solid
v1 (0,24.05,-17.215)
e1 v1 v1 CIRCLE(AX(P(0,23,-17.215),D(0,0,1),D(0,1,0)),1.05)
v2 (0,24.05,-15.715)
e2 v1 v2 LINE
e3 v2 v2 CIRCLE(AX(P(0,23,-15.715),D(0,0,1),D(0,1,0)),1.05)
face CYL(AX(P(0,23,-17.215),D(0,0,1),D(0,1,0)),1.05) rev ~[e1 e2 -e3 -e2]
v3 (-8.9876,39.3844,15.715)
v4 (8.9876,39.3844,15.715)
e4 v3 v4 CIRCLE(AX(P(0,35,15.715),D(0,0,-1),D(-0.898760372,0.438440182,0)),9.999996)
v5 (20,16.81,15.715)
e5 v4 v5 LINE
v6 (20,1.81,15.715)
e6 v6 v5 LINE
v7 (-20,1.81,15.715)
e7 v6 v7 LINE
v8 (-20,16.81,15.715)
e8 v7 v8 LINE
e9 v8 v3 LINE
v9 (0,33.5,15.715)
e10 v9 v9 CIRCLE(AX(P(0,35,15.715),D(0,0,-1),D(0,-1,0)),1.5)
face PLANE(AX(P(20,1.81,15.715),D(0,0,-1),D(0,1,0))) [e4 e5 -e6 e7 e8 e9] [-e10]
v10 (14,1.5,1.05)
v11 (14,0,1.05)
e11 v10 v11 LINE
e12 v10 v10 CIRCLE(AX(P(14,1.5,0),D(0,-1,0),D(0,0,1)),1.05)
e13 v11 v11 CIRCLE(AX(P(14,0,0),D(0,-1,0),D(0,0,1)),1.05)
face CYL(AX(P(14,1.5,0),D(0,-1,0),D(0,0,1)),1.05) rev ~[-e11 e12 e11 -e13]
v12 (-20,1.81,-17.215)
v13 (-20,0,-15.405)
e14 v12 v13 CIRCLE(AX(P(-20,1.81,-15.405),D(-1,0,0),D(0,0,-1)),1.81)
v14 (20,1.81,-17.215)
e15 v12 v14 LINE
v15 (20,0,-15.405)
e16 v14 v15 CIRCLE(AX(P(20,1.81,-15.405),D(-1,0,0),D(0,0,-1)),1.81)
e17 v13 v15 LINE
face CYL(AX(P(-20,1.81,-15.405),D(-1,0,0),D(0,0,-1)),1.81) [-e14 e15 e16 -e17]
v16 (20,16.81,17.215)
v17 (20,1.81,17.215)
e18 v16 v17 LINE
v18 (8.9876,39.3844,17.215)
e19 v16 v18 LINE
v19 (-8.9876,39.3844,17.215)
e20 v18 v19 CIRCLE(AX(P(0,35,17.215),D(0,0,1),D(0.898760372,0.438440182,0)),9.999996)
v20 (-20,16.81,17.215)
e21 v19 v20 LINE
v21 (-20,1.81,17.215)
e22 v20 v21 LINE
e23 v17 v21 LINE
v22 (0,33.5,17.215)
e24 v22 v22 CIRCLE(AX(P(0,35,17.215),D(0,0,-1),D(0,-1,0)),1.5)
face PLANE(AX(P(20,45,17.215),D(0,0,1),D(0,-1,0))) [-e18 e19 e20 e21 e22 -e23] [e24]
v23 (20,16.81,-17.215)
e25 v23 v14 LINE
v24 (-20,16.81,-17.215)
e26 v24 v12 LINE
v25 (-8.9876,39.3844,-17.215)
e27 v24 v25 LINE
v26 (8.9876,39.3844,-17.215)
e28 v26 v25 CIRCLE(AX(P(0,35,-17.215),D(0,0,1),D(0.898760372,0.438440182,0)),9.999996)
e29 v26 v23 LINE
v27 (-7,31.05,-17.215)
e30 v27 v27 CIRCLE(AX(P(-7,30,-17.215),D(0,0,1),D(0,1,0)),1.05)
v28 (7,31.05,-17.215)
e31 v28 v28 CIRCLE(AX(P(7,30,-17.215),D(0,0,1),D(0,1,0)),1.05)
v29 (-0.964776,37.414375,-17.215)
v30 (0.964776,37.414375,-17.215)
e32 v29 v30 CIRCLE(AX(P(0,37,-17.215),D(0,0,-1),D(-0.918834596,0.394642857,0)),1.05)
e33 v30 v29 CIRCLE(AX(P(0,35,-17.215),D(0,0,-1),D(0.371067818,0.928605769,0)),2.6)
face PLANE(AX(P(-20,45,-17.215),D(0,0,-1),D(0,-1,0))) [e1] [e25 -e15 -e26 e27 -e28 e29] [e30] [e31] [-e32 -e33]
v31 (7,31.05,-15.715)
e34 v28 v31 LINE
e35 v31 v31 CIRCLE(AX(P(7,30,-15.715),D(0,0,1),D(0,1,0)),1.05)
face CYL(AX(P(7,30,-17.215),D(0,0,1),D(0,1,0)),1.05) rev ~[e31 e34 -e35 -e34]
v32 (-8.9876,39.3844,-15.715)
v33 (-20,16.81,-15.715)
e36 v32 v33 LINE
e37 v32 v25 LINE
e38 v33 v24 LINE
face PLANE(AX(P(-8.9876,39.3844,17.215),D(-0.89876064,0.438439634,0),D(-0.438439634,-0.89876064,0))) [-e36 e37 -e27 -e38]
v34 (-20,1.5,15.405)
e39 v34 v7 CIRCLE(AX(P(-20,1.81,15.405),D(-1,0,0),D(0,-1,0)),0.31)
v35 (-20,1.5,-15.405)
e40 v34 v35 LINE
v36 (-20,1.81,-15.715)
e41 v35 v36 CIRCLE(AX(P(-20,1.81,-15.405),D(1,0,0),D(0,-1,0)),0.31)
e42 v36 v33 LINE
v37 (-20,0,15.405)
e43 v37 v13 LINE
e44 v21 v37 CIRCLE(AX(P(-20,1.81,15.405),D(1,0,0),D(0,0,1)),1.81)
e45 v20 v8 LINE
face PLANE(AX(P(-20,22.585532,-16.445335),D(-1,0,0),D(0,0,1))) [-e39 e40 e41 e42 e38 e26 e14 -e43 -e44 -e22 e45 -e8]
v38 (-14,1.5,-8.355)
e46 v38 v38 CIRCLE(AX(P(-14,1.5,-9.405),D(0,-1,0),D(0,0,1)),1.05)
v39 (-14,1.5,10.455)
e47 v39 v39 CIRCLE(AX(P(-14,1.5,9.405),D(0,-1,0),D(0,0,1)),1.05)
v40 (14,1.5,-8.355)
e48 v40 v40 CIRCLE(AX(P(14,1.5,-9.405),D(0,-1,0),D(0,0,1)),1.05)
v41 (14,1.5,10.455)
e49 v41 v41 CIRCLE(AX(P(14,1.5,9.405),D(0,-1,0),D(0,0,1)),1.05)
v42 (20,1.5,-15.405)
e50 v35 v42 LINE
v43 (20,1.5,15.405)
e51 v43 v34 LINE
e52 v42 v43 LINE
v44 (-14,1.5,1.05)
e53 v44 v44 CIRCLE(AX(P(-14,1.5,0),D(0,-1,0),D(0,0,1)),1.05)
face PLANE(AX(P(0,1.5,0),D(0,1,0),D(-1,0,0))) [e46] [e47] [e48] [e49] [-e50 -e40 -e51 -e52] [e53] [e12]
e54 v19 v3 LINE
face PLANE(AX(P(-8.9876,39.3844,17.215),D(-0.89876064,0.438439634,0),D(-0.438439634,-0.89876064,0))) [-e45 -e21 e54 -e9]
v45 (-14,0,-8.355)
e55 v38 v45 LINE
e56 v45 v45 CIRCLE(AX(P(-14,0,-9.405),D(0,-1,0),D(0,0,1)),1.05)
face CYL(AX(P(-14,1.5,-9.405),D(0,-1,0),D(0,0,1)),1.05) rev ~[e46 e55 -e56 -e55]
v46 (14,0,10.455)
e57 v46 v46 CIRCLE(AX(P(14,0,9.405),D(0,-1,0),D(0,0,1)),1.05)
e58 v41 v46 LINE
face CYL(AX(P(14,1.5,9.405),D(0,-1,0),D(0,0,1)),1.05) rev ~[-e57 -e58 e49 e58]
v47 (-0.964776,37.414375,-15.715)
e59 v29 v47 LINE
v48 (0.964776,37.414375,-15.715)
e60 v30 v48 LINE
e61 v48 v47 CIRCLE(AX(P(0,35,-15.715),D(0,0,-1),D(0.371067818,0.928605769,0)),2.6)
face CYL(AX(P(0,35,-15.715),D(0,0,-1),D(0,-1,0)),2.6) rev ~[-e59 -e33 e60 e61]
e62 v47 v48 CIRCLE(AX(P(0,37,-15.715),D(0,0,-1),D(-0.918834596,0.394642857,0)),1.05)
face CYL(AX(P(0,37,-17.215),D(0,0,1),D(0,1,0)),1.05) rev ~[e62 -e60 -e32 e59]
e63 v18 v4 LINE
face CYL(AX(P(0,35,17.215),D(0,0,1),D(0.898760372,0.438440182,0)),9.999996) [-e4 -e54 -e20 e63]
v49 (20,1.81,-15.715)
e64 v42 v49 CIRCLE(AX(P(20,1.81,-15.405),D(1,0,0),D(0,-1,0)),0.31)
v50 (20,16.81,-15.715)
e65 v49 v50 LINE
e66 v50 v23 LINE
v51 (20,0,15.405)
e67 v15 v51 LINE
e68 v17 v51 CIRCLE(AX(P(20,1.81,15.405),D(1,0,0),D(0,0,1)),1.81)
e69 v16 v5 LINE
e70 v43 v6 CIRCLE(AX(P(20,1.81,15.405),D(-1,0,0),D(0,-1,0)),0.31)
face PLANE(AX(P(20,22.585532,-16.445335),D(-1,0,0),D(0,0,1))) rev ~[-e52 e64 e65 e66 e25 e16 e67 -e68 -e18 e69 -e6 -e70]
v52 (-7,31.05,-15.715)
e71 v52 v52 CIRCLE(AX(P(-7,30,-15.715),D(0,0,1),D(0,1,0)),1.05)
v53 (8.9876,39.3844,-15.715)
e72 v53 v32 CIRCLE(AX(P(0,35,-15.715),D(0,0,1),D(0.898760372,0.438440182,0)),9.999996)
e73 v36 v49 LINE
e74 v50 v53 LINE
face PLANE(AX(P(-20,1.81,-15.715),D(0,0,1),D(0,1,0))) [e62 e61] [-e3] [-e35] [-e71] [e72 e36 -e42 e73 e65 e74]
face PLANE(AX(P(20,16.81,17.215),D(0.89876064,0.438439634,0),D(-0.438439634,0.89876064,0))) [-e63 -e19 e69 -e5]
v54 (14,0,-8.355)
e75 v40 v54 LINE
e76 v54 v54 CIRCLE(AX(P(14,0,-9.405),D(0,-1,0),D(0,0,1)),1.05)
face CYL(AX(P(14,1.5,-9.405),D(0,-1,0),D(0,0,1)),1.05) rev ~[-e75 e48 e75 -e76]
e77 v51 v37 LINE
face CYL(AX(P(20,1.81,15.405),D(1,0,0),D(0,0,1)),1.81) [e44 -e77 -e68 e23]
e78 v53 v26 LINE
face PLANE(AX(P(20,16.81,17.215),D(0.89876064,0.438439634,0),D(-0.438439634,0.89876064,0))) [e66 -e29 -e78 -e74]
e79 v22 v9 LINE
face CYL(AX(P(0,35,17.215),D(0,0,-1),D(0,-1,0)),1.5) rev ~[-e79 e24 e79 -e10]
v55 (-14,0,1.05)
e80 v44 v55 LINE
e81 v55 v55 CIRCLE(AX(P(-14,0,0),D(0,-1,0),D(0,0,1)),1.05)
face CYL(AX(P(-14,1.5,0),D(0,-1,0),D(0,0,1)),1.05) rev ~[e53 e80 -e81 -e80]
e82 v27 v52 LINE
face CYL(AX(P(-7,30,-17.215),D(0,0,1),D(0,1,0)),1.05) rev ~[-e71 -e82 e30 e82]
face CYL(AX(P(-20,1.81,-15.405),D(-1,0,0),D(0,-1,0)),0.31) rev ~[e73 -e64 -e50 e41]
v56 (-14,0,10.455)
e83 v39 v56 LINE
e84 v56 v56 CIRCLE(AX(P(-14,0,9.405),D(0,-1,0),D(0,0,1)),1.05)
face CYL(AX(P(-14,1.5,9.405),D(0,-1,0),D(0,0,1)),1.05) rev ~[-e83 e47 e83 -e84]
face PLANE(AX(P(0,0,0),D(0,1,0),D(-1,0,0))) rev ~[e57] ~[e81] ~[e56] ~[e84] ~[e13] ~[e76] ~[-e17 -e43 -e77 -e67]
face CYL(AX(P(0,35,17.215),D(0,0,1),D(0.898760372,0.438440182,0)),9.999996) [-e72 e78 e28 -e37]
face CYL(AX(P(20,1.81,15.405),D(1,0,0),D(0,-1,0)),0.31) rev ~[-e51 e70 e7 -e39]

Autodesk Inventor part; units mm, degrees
ref_plane "YZ Plane" through (0, 0, 0) normal (1, 0, 0) x (0, 1, 0)
ref_plane "XZ Plane" through (0, 0, 0) normal (0, 1, 0) x (-1, 0, 0)
ref_plane "XY Plane" through (0, 0, 0) normal (0, 0, 1) x (1, 0, 0)
sketch "Sketch1" plane through (0, 0, 0) normal (0, 1, 0) x (-1, 0, 0)
  line L0 (20, -15.715) -> (-20, -15.715)
  line L1 (-20, -15.715) -> (-20, 15.715)
  line L2 (-20, 15.715) -> (20, 15.715)
  line L3 (20, 15.715) -> (20, -15.715)
  point P0 (0, 0)
  dimension "d0" = 40
  dimension "d1" = 20
  dimension "d2" = 31.43
  dimension "d3" = 15.715
extrude "Plate1" add sketch "Sketch1" along normal blind 1.5
sketch "Sketch2" plane through (20, 0, 17.215) normal (0, 0, -1) x (-1, 0, 0)
  line L0 (40, 0) -> (0, 0)
  line L1 (0, 0) -> (0, 45)
  line L2 (0, 45) -> (40, 45)
  line L3 (40, 45) -> (40, 0)
edge flange "Flange1" height 45 angle 90 thickness 1.5 bend radius 0.31 thickness toward (0, 0, -1) relief tear relief width 1.5 relief depth 0.75 edges at (0, 1.5, 15.715) wall of the first edge with corners at (-20, 0, 17.215) (20, 0, 17.215) (20, 45, 17.215) (-20, 45, 17.215)
bend "Bend1"
corner "Corner1"
sketch "Sketch3" plane through (-20, 0, -17.215) normal (0, 0, 1) x (1, 0, 0)
  line L0 (40, 0) -> (0, 0)
  line L1 (0, 0) -> (0, 45)
  line L2 (0, 45) -> (40, 45)
  line L3 (40, 45) -> (40, 0)
edge flange "Flange2" height 45 angle 90 thickness 1.5 bend radius 0.31 thickness toward (0, 0, 1) relief tear relief width 1.5 relief depth 0.75 edges at (0, 1.5, -15.715) wall of the first edge with corners at (20, 0, -17.215) (-20, 0, -17.215) (-20, 45, -17.215) (20, 45, -17.215)
bend "Bend2"
corner "Corner2"
sketch "Sketch4" plane through (-20, 45, 17.215) normal (0, 0, 1) x (1, 0, 0)
  line L0 (0, -43.19) -> (0, 0) projected
  line L1 (0, 0) -> (40, 0) projected
  line L2 (40, 0) -> (40, -43.19) projected
  line L3 (0, -43.19) -> (40, -43.19) projected
  arc A0 (28.9876, -5.6156) -> (11.0124, -5.6156) centre (20, -10) ccw
  line L4 (0, -38.19) -> (40, -38.19)
  line L5 (40, -38.19) -> (40, -28.19)
  line L6 (40, -28.19) -> (0, -28.19)
  line L7 (0, -28.19) -> (0, -38.19)
  line L8 (40, -28.19) -> (28.9876, -5.6156)
  line L9 (11.0124, -5.6156) -> (0, -28.19)
  point P0 (0, -28.19)
  point P1 (20, 0)
  point P2 (40, -28.19)
  dimension "d50" = 10
  dimension "d51" = 20
  dimension "d52" = 20
  dimension "d53" = 38.19
  dimension "d54" = 10
  dimension "d55" = 40
  dimension "d56" = 40
extrude "Extrusion1" cut sketch "Sketch4" against normal blind 50 contours L0 L1 A0 L9 | L8 A0 L1 L2
sketch "Sketch5" plane through (20, 1.81, -17.215) normal (0, 0, -1) x (-1, 0, 0)
  arc A0 (20, 38.19) -> (20, 38.19) centre (20, 28.19) ccw projected
  circle A1 centre (20, 35.19) radius 1.05
  circle A2 centre (13, 28.19) radius 1.05
  circle A3 centre (20, 21.19) radius 1.05
  circle A4 centre (27, 28.19) radius 1.05
  point P0 (20, -1.81)
  dimension "d36" = 7
  dimension "d37" = 0
  dimension "d38" = 2.1
  dimension "d41" = 360
hole "Hole1" at (7, 30, -17.215) at (0, 23, -17.215) at (-7, 30, -17.215) at (0, 37, -17.215) direction (0, 0, 1) diameter 2.1 depth 1.5
sketch "Sketch6" plane through (-20, 1.81, 17.215) normal (0, 0, 1) x (1, 0, 0)
  arc A0 (28.9876, 37.5744) -> (11.0124, 37.5744) centre (20, 33.19) ccw projected
  point P0 (20, -1.81)
hole "Hole2" at (0, 35, 17.215) direction (0, 0, -1) diameter 3 depth 1.5
sketch "Sketch7" plane through (-20, 1.81, -15.715) normal (0, 0, 1) x (1, 0, 0)
  arc A0 (28.9876, 37.5744) -> (11.0124, 37.5744) centre (20, 33.19) ccw projected
  point P0 (20, -1.81)
hole "Hole3" at (0, 35, -15.715) direction (0, 0, -1) diameter 5.2 depth 1.5 clearance for "Hex Head Bolt" size "M5" standard "Ansi Metric M Profile"
sketch "Sketch8" plane through (0, 1.5, 0) normal (0, 1, 0) x (1, 0, 0)
  line L0 (20, 15.405) -> (20, -15.405) projected
  line L1 (20, -15.715) -> (-20, -15.715) projected
  line L2 (-20, -15.405) -> (20, -15.405) projected
  line L3 (20, 15.405) -> (-20, 15.405) projected
  point P0 (0, 0)
  point P1 (14, -9.405)
  point P2 (-14, -9.405)
  point P3 (14, 0)
  point P4 (-14, 0)
  point P5 (14, 9.405)
  point P6 (-14, 9.405)
  dimension "d71" = 6
  dimension "d73" = 6
  dimension "d76" = 28
  dimension "d79" = 9.405
hole "Hole4" at (14, 1.5, 9.405) at (-14, 1.5, 9.405) at (14, 1.5, 0) at (-14, 1.5, 0) at (14, 1.5, -9.405) at (-14, 1.5, -9.405) direction (0, -1, 0) diameter 2.1 depth 1.5
equation "\"d48\" = Thickness"
equation "\"d62\" = Thickness"
equation "\"d69\" = Thickness"
equation "\"d87\" = Thickness"
equation "\"d4\" = Thickness"
equation "\"d5\" = BendReliefWidth"
equation "\"d6\" = BendReliefDepth"
equation "\"d7\" = MinimumRemnant"
equation "\"d8\" = TransitionRadius"
equation "\"d11\" = BendRadius"
equation "\"d12\" = CornerReliefSize"
equation "\"d13\" = GapSize"
equation "\"d14\" = JacobiRadiusSize"
equation "\"d15\" = BendReliefWidth"
equation "\"d16\" = BendReliefDepth"
equation "\"d17\" = MinimumRemnant"
equation "\"d18\" = TransitionRadius"
equation "\"d21\" = BendRadius"
equation "\"d22\" = CornerReliefSize"
equation "\"d23\" = GapSize"
equation "\"d24\" = JacobiRadiusSize"
equation "\"BendReliefWidth\" = Thickness"
equation "\"BendReliefDepth\" = 0.5 * Thickness"
equation "\"CornerReliefSize\" = 4 * Thickness"
equation "\"MinimumRemnant\" = 2 * Thickness"
equation "\"TransitionRadius\" = BendRadius"
equation "\"JacobiRadiusSize\" = BendRadius"
equation "\"GapSize\" = Thickness"
equation "\"Thickness\" = 1.5"
equation "\"BendRadius\" = 0.31"
properties part number "axis_12_bottom_frame(top)" material "Aluminum 6061-AHC"
